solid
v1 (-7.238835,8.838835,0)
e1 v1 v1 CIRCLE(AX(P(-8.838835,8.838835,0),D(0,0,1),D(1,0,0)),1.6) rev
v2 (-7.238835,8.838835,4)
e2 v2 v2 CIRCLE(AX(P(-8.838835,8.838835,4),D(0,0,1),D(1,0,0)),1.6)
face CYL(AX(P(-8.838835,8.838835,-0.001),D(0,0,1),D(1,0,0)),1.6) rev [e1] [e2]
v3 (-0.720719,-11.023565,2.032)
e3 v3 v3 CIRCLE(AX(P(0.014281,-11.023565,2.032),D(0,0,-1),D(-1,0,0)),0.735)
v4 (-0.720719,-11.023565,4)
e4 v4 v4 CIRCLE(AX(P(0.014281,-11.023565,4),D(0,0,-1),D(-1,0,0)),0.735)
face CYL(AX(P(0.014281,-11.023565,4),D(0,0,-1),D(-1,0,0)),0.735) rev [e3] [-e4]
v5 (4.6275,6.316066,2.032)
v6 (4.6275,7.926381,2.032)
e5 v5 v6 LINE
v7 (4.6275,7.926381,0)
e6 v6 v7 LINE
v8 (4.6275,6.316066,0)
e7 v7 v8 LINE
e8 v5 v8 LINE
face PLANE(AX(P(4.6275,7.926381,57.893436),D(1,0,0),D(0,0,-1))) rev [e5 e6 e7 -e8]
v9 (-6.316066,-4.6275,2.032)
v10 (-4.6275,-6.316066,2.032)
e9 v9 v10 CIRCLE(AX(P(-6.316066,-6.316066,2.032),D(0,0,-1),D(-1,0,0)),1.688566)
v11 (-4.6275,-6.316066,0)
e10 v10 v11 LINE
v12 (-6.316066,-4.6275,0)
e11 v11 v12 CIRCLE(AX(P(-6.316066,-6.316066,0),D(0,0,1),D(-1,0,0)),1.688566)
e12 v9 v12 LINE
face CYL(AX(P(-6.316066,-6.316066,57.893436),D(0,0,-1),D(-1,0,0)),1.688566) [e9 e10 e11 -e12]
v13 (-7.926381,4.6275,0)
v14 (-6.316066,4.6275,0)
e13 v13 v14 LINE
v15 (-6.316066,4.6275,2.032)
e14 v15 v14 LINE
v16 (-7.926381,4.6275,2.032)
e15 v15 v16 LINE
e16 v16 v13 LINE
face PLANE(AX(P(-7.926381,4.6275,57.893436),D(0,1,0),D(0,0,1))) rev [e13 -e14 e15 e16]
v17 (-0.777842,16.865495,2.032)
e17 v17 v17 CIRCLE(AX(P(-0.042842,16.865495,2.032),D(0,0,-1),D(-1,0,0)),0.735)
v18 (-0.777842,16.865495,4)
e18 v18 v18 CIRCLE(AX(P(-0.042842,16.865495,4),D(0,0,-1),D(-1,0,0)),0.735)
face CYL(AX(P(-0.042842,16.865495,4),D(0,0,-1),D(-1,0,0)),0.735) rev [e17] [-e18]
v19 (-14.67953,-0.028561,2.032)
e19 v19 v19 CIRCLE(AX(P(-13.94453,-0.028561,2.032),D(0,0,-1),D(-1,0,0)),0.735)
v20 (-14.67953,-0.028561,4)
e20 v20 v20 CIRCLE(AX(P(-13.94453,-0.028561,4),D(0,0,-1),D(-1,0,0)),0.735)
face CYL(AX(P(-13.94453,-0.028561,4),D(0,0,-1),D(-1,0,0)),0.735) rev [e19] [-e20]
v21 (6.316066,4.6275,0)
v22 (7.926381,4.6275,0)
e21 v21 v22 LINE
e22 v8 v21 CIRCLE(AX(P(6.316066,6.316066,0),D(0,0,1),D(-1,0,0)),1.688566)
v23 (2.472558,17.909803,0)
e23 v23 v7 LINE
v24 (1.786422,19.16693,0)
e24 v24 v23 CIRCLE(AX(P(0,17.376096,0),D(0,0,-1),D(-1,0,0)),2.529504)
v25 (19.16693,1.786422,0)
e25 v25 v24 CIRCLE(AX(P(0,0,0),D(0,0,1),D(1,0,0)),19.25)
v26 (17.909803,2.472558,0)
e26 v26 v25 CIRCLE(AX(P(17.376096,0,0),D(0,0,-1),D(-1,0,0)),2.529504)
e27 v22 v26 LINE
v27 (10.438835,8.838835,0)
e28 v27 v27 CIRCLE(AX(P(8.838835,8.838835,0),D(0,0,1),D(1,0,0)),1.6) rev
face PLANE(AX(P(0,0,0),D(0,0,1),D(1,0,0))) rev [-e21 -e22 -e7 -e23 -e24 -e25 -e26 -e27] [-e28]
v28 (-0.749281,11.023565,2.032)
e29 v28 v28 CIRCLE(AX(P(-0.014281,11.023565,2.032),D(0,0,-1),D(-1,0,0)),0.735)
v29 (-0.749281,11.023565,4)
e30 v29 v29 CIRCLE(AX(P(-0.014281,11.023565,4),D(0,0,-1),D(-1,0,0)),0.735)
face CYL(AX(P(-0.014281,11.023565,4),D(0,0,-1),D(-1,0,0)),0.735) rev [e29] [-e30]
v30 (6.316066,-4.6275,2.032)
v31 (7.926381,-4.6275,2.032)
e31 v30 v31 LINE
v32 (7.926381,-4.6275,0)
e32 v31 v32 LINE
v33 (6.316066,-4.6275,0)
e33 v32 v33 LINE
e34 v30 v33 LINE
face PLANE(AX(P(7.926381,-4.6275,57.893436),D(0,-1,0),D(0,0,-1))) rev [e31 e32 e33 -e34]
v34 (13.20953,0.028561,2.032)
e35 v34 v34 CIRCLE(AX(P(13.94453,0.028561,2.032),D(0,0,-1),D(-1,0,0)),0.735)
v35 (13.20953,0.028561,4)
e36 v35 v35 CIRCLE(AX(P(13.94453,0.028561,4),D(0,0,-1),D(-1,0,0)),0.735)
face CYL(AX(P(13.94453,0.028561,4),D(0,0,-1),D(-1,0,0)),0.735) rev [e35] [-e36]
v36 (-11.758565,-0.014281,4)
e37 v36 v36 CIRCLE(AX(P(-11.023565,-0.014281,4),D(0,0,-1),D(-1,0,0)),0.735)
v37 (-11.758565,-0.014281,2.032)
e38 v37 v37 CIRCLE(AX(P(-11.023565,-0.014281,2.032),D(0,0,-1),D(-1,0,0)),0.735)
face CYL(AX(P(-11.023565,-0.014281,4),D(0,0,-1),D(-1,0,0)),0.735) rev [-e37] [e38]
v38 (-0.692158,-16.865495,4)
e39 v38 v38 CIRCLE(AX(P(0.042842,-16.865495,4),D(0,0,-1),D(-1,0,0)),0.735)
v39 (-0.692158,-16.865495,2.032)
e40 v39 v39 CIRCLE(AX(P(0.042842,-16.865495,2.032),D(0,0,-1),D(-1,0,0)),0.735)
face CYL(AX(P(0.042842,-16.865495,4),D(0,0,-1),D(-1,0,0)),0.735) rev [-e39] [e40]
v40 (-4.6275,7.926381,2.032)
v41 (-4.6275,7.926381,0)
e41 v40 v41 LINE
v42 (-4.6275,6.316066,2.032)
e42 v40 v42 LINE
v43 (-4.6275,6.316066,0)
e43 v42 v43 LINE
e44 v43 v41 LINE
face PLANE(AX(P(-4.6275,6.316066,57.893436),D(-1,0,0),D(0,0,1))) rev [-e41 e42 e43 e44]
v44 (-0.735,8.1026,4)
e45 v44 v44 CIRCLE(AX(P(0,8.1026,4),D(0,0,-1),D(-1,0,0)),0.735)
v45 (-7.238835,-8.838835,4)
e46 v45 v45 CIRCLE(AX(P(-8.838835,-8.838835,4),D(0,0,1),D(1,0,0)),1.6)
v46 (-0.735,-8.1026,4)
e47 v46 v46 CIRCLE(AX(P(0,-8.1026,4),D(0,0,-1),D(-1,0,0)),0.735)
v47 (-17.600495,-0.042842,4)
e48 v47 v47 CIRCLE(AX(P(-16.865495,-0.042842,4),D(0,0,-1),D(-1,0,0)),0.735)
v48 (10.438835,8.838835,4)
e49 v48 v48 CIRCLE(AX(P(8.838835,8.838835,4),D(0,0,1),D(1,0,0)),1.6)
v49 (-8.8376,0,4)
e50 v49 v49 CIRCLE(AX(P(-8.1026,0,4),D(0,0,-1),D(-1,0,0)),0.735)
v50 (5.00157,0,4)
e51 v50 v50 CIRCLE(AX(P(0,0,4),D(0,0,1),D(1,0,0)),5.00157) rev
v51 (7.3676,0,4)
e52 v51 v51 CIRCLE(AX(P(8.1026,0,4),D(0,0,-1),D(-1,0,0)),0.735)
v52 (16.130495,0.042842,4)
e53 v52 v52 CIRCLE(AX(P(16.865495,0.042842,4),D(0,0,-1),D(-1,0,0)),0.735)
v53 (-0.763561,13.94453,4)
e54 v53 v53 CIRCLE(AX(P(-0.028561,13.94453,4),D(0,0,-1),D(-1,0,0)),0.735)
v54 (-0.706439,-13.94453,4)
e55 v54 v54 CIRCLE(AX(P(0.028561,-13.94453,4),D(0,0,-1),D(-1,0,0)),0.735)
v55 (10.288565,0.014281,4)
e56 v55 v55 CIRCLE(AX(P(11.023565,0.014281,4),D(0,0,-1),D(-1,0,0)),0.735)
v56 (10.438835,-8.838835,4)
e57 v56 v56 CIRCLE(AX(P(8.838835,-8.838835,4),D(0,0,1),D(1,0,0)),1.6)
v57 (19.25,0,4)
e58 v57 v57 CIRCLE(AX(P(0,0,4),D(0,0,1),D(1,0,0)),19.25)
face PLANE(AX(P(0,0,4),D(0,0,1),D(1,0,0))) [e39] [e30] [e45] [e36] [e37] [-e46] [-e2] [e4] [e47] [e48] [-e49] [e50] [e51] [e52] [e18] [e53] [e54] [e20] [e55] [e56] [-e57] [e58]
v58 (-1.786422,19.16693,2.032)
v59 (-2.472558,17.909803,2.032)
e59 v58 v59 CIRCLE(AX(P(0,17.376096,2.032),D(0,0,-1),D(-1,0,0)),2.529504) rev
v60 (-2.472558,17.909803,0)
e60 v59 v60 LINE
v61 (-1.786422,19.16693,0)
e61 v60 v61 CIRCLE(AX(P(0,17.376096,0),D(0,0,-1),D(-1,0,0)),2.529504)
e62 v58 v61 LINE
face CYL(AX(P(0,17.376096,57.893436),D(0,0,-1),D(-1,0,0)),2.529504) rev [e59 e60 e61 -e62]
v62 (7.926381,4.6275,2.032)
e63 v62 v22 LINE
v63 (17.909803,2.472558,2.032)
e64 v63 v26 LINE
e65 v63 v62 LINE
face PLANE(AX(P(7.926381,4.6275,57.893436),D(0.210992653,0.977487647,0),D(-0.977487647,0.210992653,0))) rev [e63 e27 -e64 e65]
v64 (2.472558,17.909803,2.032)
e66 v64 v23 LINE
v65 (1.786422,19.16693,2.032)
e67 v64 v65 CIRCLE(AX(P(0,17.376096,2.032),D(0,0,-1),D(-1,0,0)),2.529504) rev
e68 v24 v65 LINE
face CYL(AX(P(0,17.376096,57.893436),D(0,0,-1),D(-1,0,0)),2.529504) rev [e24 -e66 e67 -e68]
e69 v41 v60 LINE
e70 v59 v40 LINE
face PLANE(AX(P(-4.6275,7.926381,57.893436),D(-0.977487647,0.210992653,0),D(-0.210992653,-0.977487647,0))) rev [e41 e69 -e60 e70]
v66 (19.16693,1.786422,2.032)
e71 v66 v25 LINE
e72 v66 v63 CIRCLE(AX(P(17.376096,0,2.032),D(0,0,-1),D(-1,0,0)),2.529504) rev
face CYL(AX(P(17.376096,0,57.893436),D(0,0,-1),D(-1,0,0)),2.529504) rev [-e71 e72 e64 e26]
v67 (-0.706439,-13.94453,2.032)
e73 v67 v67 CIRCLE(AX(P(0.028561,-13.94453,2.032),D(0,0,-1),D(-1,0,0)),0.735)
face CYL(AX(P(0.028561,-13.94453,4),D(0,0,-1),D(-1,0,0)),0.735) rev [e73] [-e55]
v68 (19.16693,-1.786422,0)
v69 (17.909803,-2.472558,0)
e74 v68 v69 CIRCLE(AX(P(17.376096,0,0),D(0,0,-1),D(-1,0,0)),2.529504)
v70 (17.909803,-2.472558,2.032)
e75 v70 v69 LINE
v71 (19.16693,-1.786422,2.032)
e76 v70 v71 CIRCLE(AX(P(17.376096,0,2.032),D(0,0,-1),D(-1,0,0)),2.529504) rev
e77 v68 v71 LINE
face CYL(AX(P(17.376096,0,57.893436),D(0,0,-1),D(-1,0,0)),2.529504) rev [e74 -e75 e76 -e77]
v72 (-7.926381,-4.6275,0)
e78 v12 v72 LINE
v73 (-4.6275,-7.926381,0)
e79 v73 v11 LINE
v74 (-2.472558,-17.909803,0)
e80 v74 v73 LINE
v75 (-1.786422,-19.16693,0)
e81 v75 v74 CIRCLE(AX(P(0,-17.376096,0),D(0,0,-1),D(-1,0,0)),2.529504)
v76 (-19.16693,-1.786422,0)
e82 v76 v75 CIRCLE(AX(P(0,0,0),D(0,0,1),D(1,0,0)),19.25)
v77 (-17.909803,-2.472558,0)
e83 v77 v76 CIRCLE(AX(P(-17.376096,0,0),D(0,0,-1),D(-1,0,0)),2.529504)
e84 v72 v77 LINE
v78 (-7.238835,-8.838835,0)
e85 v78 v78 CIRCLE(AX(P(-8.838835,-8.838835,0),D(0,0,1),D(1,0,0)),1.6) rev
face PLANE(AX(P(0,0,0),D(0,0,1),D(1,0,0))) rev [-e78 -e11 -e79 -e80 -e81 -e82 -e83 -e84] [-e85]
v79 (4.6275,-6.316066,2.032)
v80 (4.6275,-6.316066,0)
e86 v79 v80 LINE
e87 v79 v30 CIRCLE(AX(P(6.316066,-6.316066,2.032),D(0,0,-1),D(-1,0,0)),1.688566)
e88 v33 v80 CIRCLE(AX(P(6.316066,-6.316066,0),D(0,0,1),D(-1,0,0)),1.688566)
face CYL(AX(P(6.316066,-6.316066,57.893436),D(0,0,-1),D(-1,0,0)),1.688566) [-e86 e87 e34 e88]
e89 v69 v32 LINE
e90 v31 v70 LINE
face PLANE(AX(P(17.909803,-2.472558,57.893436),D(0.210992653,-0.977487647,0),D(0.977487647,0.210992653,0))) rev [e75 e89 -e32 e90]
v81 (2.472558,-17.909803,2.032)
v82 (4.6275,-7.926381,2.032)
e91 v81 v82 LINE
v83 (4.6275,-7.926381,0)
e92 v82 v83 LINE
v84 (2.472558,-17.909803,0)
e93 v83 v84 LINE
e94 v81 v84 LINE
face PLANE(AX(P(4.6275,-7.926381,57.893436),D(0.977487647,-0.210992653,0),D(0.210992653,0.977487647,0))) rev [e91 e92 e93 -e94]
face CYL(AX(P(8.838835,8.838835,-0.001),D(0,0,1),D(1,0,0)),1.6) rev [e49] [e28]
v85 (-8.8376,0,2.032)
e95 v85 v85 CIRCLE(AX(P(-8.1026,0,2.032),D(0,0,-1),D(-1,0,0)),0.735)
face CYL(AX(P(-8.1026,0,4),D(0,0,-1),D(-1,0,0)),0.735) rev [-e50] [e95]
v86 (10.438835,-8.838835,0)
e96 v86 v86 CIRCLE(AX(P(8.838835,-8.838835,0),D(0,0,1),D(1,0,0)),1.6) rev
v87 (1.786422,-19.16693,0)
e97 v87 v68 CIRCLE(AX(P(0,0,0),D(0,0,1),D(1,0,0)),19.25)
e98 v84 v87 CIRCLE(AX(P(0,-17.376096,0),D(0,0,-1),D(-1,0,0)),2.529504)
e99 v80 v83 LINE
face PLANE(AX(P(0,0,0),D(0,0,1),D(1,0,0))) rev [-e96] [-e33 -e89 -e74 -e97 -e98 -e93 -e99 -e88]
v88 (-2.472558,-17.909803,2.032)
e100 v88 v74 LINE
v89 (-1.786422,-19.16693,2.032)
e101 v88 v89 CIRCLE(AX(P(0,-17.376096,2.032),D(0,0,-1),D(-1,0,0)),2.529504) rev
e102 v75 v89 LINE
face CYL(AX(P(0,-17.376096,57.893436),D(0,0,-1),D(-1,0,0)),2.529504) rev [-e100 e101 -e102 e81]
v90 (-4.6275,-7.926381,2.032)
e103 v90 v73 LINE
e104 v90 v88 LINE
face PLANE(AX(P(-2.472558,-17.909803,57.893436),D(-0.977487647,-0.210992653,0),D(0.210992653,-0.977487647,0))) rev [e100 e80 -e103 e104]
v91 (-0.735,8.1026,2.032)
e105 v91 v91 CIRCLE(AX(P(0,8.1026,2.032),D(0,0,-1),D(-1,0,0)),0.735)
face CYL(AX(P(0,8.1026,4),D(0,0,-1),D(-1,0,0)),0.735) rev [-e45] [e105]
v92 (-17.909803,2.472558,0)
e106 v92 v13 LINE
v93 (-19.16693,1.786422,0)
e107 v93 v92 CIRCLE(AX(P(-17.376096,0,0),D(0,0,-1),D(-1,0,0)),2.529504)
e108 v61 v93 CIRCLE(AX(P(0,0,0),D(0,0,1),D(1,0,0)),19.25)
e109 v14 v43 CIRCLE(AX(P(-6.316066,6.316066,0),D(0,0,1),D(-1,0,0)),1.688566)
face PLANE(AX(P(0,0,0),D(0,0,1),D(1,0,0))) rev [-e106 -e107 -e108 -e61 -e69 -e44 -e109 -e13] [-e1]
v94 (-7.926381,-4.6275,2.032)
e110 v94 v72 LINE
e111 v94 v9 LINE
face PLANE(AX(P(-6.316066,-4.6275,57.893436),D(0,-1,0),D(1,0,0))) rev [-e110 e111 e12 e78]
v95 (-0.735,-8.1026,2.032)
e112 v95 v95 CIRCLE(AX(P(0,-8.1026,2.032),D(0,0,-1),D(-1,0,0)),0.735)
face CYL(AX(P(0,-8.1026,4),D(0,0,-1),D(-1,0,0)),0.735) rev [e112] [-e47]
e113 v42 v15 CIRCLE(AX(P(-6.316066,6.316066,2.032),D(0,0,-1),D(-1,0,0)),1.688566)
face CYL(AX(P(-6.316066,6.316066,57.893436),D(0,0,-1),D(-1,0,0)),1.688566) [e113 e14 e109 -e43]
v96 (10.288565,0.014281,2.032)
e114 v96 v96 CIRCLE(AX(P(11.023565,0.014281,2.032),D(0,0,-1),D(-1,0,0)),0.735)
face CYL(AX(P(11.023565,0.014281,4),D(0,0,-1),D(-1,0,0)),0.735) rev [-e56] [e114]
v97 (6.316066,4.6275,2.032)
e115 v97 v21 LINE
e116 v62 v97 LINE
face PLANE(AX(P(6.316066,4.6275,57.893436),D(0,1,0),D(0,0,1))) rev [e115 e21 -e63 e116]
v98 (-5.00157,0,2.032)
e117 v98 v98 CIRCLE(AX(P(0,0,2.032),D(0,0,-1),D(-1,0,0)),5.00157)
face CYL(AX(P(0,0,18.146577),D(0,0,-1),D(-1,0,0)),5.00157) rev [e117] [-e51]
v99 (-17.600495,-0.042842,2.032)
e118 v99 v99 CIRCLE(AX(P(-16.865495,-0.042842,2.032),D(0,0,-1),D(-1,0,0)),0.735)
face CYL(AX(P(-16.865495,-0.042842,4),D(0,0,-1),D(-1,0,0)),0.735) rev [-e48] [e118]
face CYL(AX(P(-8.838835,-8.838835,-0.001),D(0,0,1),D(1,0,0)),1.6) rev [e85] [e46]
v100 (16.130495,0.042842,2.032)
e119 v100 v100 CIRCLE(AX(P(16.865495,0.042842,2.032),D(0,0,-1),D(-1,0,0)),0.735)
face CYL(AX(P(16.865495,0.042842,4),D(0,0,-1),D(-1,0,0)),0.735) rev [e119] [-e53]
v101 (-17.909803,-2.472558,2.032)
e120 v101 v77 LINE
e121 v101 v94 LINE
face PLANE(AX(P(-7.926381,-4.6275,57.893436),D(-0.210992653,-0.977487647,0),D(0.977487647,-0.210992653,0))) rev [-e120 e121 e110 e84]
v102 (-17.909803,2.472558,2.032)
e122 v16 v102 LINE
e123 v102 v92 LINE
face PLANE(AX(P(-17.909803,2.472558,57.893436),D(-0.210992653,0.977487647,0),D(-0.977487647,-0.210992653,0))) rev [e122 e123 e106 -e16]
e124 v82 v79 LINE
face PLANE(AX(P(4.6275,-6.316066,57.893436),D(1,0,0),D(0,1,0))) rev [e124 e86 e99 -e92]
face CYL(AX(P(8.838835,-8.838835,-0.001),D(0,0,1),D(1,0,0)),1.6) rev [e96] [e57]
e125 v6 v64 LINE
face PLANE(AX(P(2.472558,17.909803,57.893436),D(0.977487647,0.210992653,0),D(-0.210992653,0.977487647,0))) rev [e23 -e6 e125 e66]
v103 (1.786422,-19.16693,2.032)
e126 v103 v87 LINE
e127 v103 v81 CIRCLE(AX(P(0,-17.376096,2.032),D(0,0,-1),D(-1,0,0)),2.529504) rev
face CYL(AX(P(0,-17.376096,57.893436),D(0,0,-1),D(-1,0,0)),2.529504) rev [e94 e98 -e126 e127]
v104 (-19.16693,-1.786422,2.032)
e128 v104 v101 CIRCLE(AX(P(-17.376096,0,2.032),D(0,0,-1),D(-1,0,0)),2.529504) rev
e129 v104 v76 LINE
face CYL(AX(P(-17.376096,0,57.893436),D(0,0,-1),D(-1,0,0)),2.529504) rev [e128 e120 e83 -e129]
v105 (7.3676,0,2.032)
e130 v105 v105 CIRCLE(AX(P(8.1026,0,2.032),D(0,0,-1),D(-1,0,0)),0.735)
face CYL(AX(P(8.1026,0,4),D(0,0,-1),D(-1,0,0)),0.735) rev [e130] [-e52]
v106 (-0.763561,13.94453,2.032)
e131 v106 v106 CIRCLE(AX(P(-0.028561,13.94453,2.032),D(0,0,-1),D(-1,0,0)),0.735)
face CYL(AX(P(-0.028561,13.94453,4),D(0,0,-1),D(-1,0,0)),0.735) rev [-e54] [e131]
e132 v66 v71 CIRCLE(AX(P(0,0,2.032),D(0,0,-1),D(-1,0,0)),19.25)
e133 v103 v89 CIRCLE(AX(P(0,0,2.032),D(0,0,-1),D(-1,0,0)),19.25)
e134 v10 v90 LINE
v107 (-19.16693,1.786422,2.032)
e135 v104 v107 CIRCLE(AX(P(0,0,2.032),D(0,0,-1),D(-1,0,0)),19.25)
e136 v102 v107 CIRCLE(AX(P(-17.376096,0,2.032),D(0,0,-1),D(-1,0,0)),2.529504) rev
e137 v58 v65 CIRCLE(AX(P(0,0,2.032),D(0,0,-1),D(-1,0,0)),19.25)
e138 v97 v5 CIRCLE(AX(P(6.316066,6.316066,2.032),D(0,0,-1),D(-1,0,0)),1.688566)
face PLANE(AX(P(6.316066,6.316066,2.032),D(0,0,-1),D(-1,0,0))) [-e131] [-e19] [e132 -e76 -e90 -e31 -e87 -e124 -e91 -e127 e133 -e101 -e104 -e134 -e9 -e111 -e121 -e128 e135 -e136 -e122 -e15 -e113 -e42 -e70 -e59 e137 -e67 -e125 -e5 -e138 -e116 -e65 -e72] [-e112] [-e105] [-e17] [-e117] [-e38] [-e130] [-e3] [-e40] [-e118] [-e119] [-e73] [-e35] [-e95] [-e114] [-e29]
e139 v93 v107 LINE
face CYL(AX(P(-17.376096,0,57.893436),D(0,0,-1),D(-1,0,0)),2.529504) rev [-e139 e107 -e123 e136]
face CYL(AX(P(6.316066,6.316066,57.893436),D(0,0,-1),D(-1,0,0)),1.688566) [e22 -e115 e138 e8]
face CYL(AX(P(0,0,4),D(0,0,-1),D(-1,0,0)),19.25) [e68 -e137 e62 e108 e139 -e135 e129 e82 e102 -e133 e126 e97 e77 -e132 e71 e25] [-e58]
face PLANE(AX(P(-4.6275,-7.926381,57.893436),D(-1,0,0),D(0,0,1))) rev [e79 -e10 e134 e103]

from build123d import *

# Parameters (mm, degrees)
SKETCH1_R             = 19.25
BOSS_EXTRUDE1_DEPTH   = 4
CAVITY1_OUTLINE_R     = 0.635
CAVITY1_OUTLINE_R_2   = 2.9845
CAVITY1_DEPTH         = 2.032
CAVITY1_2_DEPTH       = 1.397
CAVITY1_START         = 0.6858
CAVITY1_3_OUTLINE_R   = 2.9845
CAVITY1_3_OUTLINE_R_2 = 1.4605
CAVITY1_3_DEPTH       = 0.7112
CAVITY1_START_2       = 2.032
CAVITY1_4_OUTLINE_R   = 19.25
CAVITY1_4_OUTLINE_R_2 = 2.9845
CAVITY1_4_DEPTH       = 0.635
SKETCH3_R             = 0.735
CUT_EXTRUDE2_DEPTH    = 28.515904492
SKETCH5_R             = 5.001570325
CUT_EXTRUDE4_DEPTH    = 4
CUT_EXTRUDE1_START    = -2.032
CUT_EXTRUDE1_DEPTH    = 2.032
CUT_EXTRUDE5_REACH    = 29.516
SKETCH6_R             = 1.6


with BuildPart() as part:
    # Sketch1 → Boss-Extrude1 (new body)
    with BuildSketch(Plane.XY):
        Circle(SKETCH1_R)
    extrude(amount=BOSS_EXTRUDE1_DEPTH)

    # Cavity1: read off the stored shape, not the designer's step
    # Cavity1 outline → Cavity1 (cut)
    with BuildSketch(Plane.XY):
        with BuildLine():
            Line((4.1275, 7.873032293), (1.983814648, 17.804306789))
            ThreePointArc((1.983814648, 17.804306789), (1.57335187, 18.658067023), (0.820101074, 19.232522825))
            ThreePointArc((0.820101074, 19.232522825), (0, 19.25), (-0.820101074, 19.232522825))
            ThreePointArc((-0.820101074, 19.232522825), (-1.57335187, 18.658067023), (-1.983814648, 17.804306789))
            Line((-1.983814648, 17.804306789), (-4.1275, 7.873032293))
            Line((-4.1275, 7.873032293), (-4.1275, 6.316065522))
            ThreePointArc((-4.1275, 6.316065522), (-4.768516, 4.768516), (-6.316065522, 4.1275))
            Line((-6.316065522, 4.1275), (-7.873032293, 4.1275))
            Line((-7.873032293, 4.1275), (-17.804306789, 1.983814648))
            ThreePointArc((-17.804306789, 1.983814648), (-18.658067023, 1.57335187), (-19.232522825, 0.820101074))
            ThreePointArc((-19.232522825, 0.820101074), (-19.25, 0), (-19.232522825, -0.820101074))
            ThreePointArc((-19.232522825, -0.820101074), (-18.658067023, -1.57335187), (-17.804306789, -1.983814648))
            Line((-17.804306789, -1.983814648), (-7.873032293, -4.1275))
            Line((-7.873032293, -4.1275), (-6.316065522, -4.1275))
            ThreePointArc((-6.316065522, -4.1275), (-4.768516, -4.768516), (-4.1275, -6.316065522))
            Line((-4.1275, -6.316065522), (-4.1275, -7.873032293))
            Line((-4.1275, -7.873032293), (-1.983814648, -17.804306789))
            ThreePointArc((-1.983814648, -17.804306789), (-1.57335187, -18.658067023), (-0.820101074, -19.232522825))
            ThreePointArc((-0.820101074, -19.232522825), (0, -19.25), (0.820101074, -19.232522825))
            ThreePointArc((0.820101074, -19.232522825), (1.57335187, -18.658067023), (1.983814648, -17.804306789))
            Line((1.983814648, -17.804306789), (4.1275, -7.873032293))
            Line((4.1275, -7.873032293), (4.1275, -6.316065522))
            ThreePointArc((4.1275, -6.316065522), (4.768516, -4.768516), (6.316065522, -4.1275))
            Line((6.316065522, -4.1275), (7.873032293, -4.1275))
            Line((7.873032293, -4.1275), (17.804306789, -1.983814648))
            ThreePointArc((17.804306789, -1.983814648), (18.658067023, -1.57335187), (19.232522825, -0.820101074))
            ThreePointArc((19.232522825, -0.820101074), (19.25, 0), (19.232522825, 0.820101074))
            ThreePointArc((19.232522825, 0.820101074), (18.658067023, 1.57335187), (17.804306789, 1.983814648))
            Line((17.804306789, 1.983814648), (7.873032293, 4.1275))
            Line((7.873032293, 4.1275), (6.316065522, 4.1275))
            ThreePointArc((6.316065522, 4.1275), (4.768516, 4.768516), (4.1275, 6.316065522))
            Line((4.1275, 6.316065522), (4.1275, 7.873032293))
        make_face()
        with Locations((-16.865495273, -0.042841993)):
            Circle(CAVITY1_OUTLINE_R, mode=Mode.SUBTRACT)
        with Locations((-13.944530182, -0.028561329)):
            Circle(CAVITY1_OUTLINE_R, mode=Mode.SUBTRACT)
        with Locations((-11.023565091, -0.014280664)):
            Circle(CAVITY1_OUTLINE_R, mode=Mode.SUBTRACT)
        with BuildLine():
            ThreePointArc((-0.381, -4.683528584), (-1.798229449, -4.341309923), (-3.042347138, -3.581162505))
            Line((-3.042347138, -3.581162505), (-2.230589816, -2.769405184))
            ThreePointArc((-2.230589816, -2.769405184), (-1.360822285, -3.285315618), (-0.381, -3.53553037))
            Line((-0.381, -3.53553037), (-0.381, -4.683528584))
        make_face(mode=Mode.SUBTRACT)
        with BuildLine():
            ThreePointArc((-3.581162505, -3.042347138), (-4.341309923, -1.798229449), (-4.683528584, -0.381))
            Line((-4.683528584, -0.381), (-3.53553037, -0.381))
            ThreePointArc((-3.53553037, -0.381), (-3.285315618, -1.360822285), (-2.769405184, -2.230589816))
            Line((-2.769405184, -2.230589816), (-3.581162505, -3.042347138))
        make_face(mode=Mode.SUBTRACT)
        with Locations((0.042841993, -16.865495273)):
            Circle(CAVITY1_OUTLINE_R, mode=Mode.SUBTRACT)
        with Locations((0.028561329, -13.944530182)):
            Circle(CAVITY1_OUTLINE_R, mode=Mode.SUBTRACT)
        with Locations((0.014280664, -11.023565091)):
            Circle(CAVITY1_OUTLINE_R, mode=Mode.SUBTRACT)
        with Locations((0, -8.1026)):
            Circle(CAVITY1_OUTLINE_R, mode=Mode.SUBTRACT)
        with BuildLine():
            ThreePointArc((3.042347138, -3.581162505), (1.798229449, -4.341309923), (0.381, -4.683528584))
            Line((0.381, -4.683528584), (0.381, -3.53553037))
            ThreePointArc((0.381, -3.53553037), (1.360822285, -3.285315618), (2.230589816, -2.769405184))
            Line((2.230589816, -2.769405184), (3.042347138, -3.581162505))
        make_face(mode=Mode.SUBTRACT)
        with BuildLine():
            ThreePointArc((4.683528584, -0.381), (4.341309923, -1.798229449), (3.581162505, -3.042347138))
            Line((3.581162505, -3.042347138), (2.769405184, -2.230589816))
            ThreePointArc((2.769405184, -2.230589816), (3.285315618, -1.360822285), (3.53553037, -0.381))
            Line((3.53553037, -0.381), (4.683528584, -0.381))
        make_face(mode=Mode.SUBTRACT)
        with Locations((-8.1026, 0)):
            Circle(CAVITY1_OUTLINE_R, mode=Mode.SUBTRACT)
        with BuildLine():
            ThreePointArc((-4.683528584, 0.381), (-4.341309923, 1.798229449), (-3.581162505, 3.042347138))
            Line((-3.581162505, 3.042347138), (-2.769405184, 2.230589816))
            ThreePointArc((-2.769405184, 2.230589816), (-3.285315618, 1.360822285), (-3.53553037, 0.381))
            Line((-3.53553037, 0.381), (-4.683528584, 0.381))
        make_face(mode=Mode.SUBTRACT)
        with BuildLine():
            ThreePointArc((-3.042347138, 3.581162505), (-1.798229449, 4.341309923), (-0.381, 4.683528584))
            Line((-0.381, 4.683528584), (-0.381, 3.53553037))
            ThreePointArc((-0.381, 3.53553037), (-1.360822285, 3.285315618), (-2.230589816, 2.769405184))
            Line((-2.230589816, 2.769405184), (-3.042347138, 3.581162505))
        make_face(mode=Mode.SUBTRACT)
        with Locations((-0.014280664, 11.023565091)):
            Circle(CAVITY1_OUTLINE_R, mode=Mode.SUBTRACT)
        with Locations((-0.028561329, 13.944530182)):
            Circle(CAVITY1_OUTLINE_R, mode=Mode.SUBTRACT)
        with Locations((-0.042841993, 16.865495273)):
            Circle(CAVITY1_OUTLINE_R, mode=Mode.SUBTRACT)
        Circle(CAVITY1_OUTLINE_R_2, mode=Mode.SUBTRACT)
        with BuildLine():
            ThreePointArc((3.581162505, 3.042347138), (4.341309923, 1.798229449), (4.683528584, 0.381))
            Line((4.683528584, 0.381), (3.53553037, 0.381))
            ThreePointArc((3.53553037, 0.381), (3.285315618, 1.360822285), (2.769405184, 2.230589816))
            Line((2.769405184, 2.230589816), (3.581162505, 3.042347138))
        make_face(mode=Mode.SUBTRACT)
        with BuildLine():
            ThreePointArc((0.381, 4.683528584), (1.798229449, 4.341309923), (3.042347138, 3.581162505))
            Line((3.042347138, 3.581162505), (2.230589816, 2.769405184))
            ThreePointArc((2.230589816, 2.769405184), (1.360822285, 3.285315618), (0.381, 3.53553037))
            Line((0.381, 3.53553037), (0.381, 4.683528584))
        make_face(mode=Mode.SUBTRACT)
        with Locations((8.1026, 0)):
            Circle(CAVITY1_OUTLINE_R, mode=Mode.SUBTRACT)
        with Locations((0, 8.1026)):
            Circle(CAVITY1_OUTLINE_R, mode=Mode.SUBTRACT)
        with Locations((11.023565091, 0.014280664)):
            Circle(CAVITY1_OUTLINE_R, mode=Mode.SUBTRACT)
        with Locations((13.944530182, 0.028561329)):
            Circle(CAVITY1_OUTLINE_R, mode=Mode.SUBTRACT)
        with Locations((16.865495273, 0.042841993)):
            Circle(CAVITY1_OUTLINE_R, mode=Mode.SUBTRACT)
    extrude(amount=CAVITY1_DEPTH, mode=Mode.SUBTRACT)

    # Cavity1 2 outline → Cavity1 2 (cut)
    with BuildSketch(Plane.XY):
        with BuildLine():
            Line((2.230589816, 2.769405184), (3.042347138, 3.581162505))
            ThreePointArc((3.042347138, 3.581162505), (1.798229449, 4.341309923), (0.381, 4.683528584))
            Line((0.381, 4.683528584), (0.381, 3.53553037))
            ThreePointArc((0.381, 3.53553037), (1.360822285, 3.285315618), (2.230589816, 2.769405184))
        make_face()
        with BuildLine():
            Line((3.53553037, 0.381), (4.683528584, 0.381))
            ThreePointArc((4.683528584, 0.381), (4.341309923, 1.798229449), (3.581162505, 3.042347138))
            Line((3.581162505, 3.042347138), (2.769405184, 2.230589816))
            ThreePointArc((2.769405184, 2.230589816), (3.285315618, 1.360822285), (3.53553037, 0.381))
        make_face()
        with BuildLine():
            Line((2.769405184, -2.230589816), (3.581162505, -3.042347138))
            ThreePointArc((3.581162505, -3.042347138), (4.341309923, -1.798229449), (4.683528584, -0.381))
            Line((4.683528584, -0.381), (3.53553037, -0.381))
            ThreePointArc((3.53553037, -0.381), (3.285315618, -1.360822285), (2.769405184, -2.230589816))
        make_face()
        with BuildLine():
            Line((0.381, -3.53553037), (0.381, -4.683528584))
            ThreePointArc((0.381, -4.683528584), (1.798229449, -4.341309923), (3.042347138, -3.581162505))
            Line((3.042347138, -3.581162505), (2.230589816, -2.769405184))
            ThreePointArc((2.230589816, -2.769405184), (1.360822285, -3.285315618), (0.381, -3.53553037))
        make_face()
        with BuildLine():
            Line((-2.230589816, -2.769405184), (-3.042347138, -3.581162505))
            ThreePointArc((-3.042347138, -3.581162505), (-1.798229449, -4.341309923), (-0.381, -4.683528584))
            Line((-0.381, -4.683528584), (-0.381, -3.53553037))
            ThreePointArc((-0.381, -3.53553037), (-1.360822285, -3.285315618), (-2.230589816, -2.769405184))
        make_face()
        with BuildLine():
            Line((-3.53553037, -0.381), (-4.683528584, -0.381))
            ThreePointArc((-4.683528584, -0.381), (-4.341309923, -1.798229449), (-3.581162505, -3.042347138))
            Line((-3.581162505, -3.042347138), (-2.769405184, -2.230589816))
            ThreePointArc((-2.769405184, -2.230589816), (-3.285315618, -1.360822285), (-3.53553037, -0.381))
        make_face()
        with BuildLine():
            Line((-2.769405184, 2.230589816), (-3.581162505, 3.042347138))
            ThreePointArc((-3.581162505, 3.042347138), (-4.341309923, 1.798229449), (-4.683528584, 0.381))
            Line((-4.683528584, 0.381), (-3.53553037, 0.381))
            ThreePointArc((-3.53553037, 0.381), (-3.285315618, 1.360822285), (-2.769405184, 2.230589816))
        make_face()
        with BuildLine():
            Line((-0.381, 3.53553037), (-0.381, 4.683528584))
            ThreePointArc((-0.381, 4.683528584), (-1.798229449, 4.341309923), (-3.042347138, 3.581162505))
            Line((-3.042347138, 3.581162505), (-2.230589816, 2.769405184))
            ThreePointArc((-2.230589816, 2.769405184), (-1.360822285, 3.285315618), (-0.381, 3.53553037))
        make_face()
    extrude(amount=CAVITY1_2_DEPTH, mode=Mode.SUBTRACT)

    # Cavity1 3 outline → Cavity1 3 (cut)
    with BuildSketch(Plane.XY.offset(CAVITY1_START)):
        Circle(CAVITY1_3_OUTLINE_R)
        Circle(CAVITY1_3_OUTLINE_R_2, mode=Mode.SUBTRACT)
    extrude(amount=CAVITY1_3_DEPTH, mode=Mode.SUBTRACT)

    # Cavity1 4 outline → Cavity1 4 (cut)
    with BuildSketch(Plane.XY.offset(CAVITY1_START_2)):
        Circle(CAVITY1_4_OUTLINE_R)
        with BuildLine():
            Line((-3.042347138, -3.581162505), (-2.230589816, -2.769405184))
            ThreePointArc((-2.230589816, -2.769405184), (-1.360822285, -3.285315618), (-0.381, -3.53553037))
            Line((-0.381, -3.53553037), (-0.381, -4.683528584))
            ThreePointArc((-0.381, -4.683528584), (-1.798229449, -4.341309923), (-3.042347138, -3.581162505))
        make_face(mode=Mode.SUBTRACT)
        with BuildLine():
            ThreePointArc((-3.53553037, -0.381), (-3.285315618, -1.360822285), (-2.769405184, -2.230589816))
            Line((-2.769405184, -2.230589816), (-3.581162505, -3.042347138))
            ThreePointArc((-3.581162505, -3.042347138), (-4.341309923, -1.798229449), (-4.683528584, -0.381))
            Line((-4.683528584, -0.381), (-3.53553037, -0.381))
        make_face(mode=Mode.SUBTRACT)
        with BuildLine():
            Line((0.381, -4.683528584), (0.381, -3.53553037))
            ThreePointArc((0.381, -3.53553037), (1.360822285, -3.285315618), (2.230589816, -2.769405184))
            Line((2.230589816, -2.769405184), (3.042347138, -3.581162505))
            ThreePointArc((3.042347138, -3.581162505), (1.798229449, -4.341309923), (0.381, -4.683528584))
        make_face(mode=Mode.SUBTRACT)
        with BuildLine():
            Line((3.581162505, -3.042347138), (2.769405184, -2.230589816))
            ThreePointArc((2.769405184, -2.230589816), (3.285315618, -1.360822285), (3.53553037, -0.381))
            Line((3.53553037, -0.381), (4.683528584, -0.381))
            ThreePointArc((4.683528584, -0.381), (4.341309923, -1.798229449), (3.581162505, -3.042347138))
        make_face(mode=Mode.SUBTRACT)
        with BuildLine():
            Line((-3.581162505, 3.042347138), (-2.769405184, 2.230589816))
            ThreePointArc((-2.769405184, 2.230589816), (-3.285315618, 1.360822285), (-3.53553037, 0.381))
            Line((-3.53553037, 0.381), (-4.683528584, 0.381))
            ThreePointArc((-4.683528584, 0.381), (-4.341309923, 1.798229449), (-3.581162505, 3.042347138))
        make_face(mode=Mode.SUBTRACT)
        with BuildLine():
            Line((-0.381, 4.683528584), (-0.381, 3.53553037))
            ThreePointArc((-0.381, 3.53553037), (-1.360822285, 3.285315618), (-2.230589816, 2.769405184))
            Line((-2.230589816, 2.769405184), (-3.042347138, 3.581162505))
            ThreePointArc((-3.042347138, 3.581162505), (-1.798229449, 4.341309923), (-0.381, 4.683528584))
        make_face(mode=Mode.SUBTRACT)
        Circle(CAVITY1_4_OUTLINE_R_2, mode=Mode.SUBTRACT)
        with BuildLine():
            Line((4.683528584, 0.381), (3.53553037, 0.381))
            ThreePointArc((3.53553037, 0.381), (3.285315618, 1.360822285), (2.769405184, 2.230589816))
            Line((2.769405184, 2.230589816), (3.581162505, 3.042347138))
            ThreePointArc((3.581162505, 3.042347138), (4.341309923, 1.798229449), (4.683528584, 0.381))
        make_face(mode=Mode.SUBTRACT)
        with BuildLine():
            ThreePointArc((0.381, 4.683528584), (1.798229449, 4.341309923), (3.042347138, 3.581162505))
            Line((3.042347138, 3.581162505), (2.230589816, 2.769405184))
            ThreePointArc((2.230589816, 2.769405184), (1.360822285, 3.285315618), (0.381, 3.53553037))
            Line((0.381, 3.53553037), (0.381, 4.683528584))
        make_face(mode=Mode.SUBTRACT)
    extrude(amount=CAVITY1_4_DEPTH, mode=Mode.SUBTRACT)

    # Cavity1 5 outline → Cavity1 5 (revolve)
    with BuildSketch(Plane.XZ):
        Polygon((4.701570325, 2.032), (19.25, 2.032), (19.25, 2.667), (3.555999999, 2.667), align=None)
    revolve(axis=Axis((0, 0, 0), (0, 0, 1)))

    # Sketch3 → Cut-Extrude2 (cut, through all)
    with BuildSketch(Plane(origin=(0, 0, 0), x_dir=(-1, 0, 0), z_dir=(0, 0, -1))):
        with Locations((16.865495273, -0.042841993)):
            Circle(SKETCH3_R)
        with Locations((13.944530182, -0.028561329)):
            Circle(SKETCH3_R)
        with Locations((11.023565091, -0.014280664)):
            Circle(SKETCH3_R)
        with Locations((8.1026, 0)):
            Circle(SKETCH3_R)
        with Locations((-0.042841993, -16.865495273)):
            Circle(SKETCH3_R)
        with Locations((-0.028561329, -13.944530182)):
            Circle(SKETCH3_R)
        with Locations((-0.014280664, -11.023565091)):
            Circle(SKETCH3_R)
        with Locations((0, -8.1026)):
            Circle(SKETCH3_R)
        with Locations((-16.865495273, 0.042841993)):
            Circle(SKETCH3_R)
        with Locations((-13.944530182, 0.028561329)):
            Circle(SKETCH3_R)
        with Locations((-11.023565091, 0.014280664)):
            Circle(SKETCH3_R)
        with Locations((-8.1026, 0)):
            Circle(SKETCH3_R)
        with Locations((0, 8.1026)):
            Circle(SKETCH3_R)
        with Locations((0.014280664, 11.023565091)):
            Circle(SKETCH3_R)
        with Locations((0.028561329, 13.944530182)):
            Circle(SKETCH3_R)
        with Locations((0.042841993, 16.865495273)):
            Circle(SKETCH3_R)
    extrude(amount=-CUT_EXTRUDE2_DEPTH, mode=Mode.SUBTRACT)

    # Sketch5 → Cut-Extrude4 (cut)
    with BuildSketch(Plane(origin=(0, 0, 0), x_dir=(-1, 0, 0), z_dir=(0, 0, -1))):
        Circle(SKETCH5_R)
    extrude(amount=-CUT_EXTRUDE4_DEPTH, mode=Mode.SUBTRACT)

    # Sketch2 → Cut-Extrude1 (cut)
    with BuildSketch(Plane(origin=(0, 0, 0), x_dir=(-1, 0, 0), z_dir=(0, 0, -1)).offset(CUT_EXTRUDE1_START)):
        with BuildLine():
            Line((-2.472558472, 17.909803115), (-4.6275, 7.926380958))
            Line((-4.6275, 7.926380958), (-4.6275, 6.316065522))
            ThreePointArc((-4.6275, 6.316065522), (-5.122069391, 5.122069391), (-6.316065522, 4.6275))
            Line((-6.316065522, 4.6275), (-7.926380958, 4.6275))
            Line((-7.926380958, 4.6275), (-17.909803115, 2.472558472))
            ThreePointArc((-17.909803115, 2.472558472), (-19.011904483, 1.929383395), (-19.72804541, 0.930980289))
            ThreePointArc((-19.72804541, 0.930980289), (-19.75, 0), (-19.72804541, -0.930980289))
            ThreePointArc((-19.72804541, -0.930980289), (-19.011904483, -1.929383395), (-17.909803115, -2.472558472))
            Line((-17.909803115, -2.472558472), (-7.926380958, -4.6275))
            Line((-7.926380958, -4.6275), (-6.316065522, -4.6275))
            ThreePointArc((-6.316065522, -4.6275), (-5.122069391, -5.122069391), (-4.6275, -6.316065522))
            Line((-4.6275, -6.316065522), (-4.6275, -7.926380958))
            Line((-4.6275, -7.926380958), (-2.472558472, -17.909803115))
            ThreePointArc((-2.472558472, -17.909803115), (-1.929383395, -19.011904483), (-0.930980289, -19.72804541))
            ThreePointArc((-0.930980289, -19.72804541), (0, -19.75), (0.930980289, -19.72804541))
            ThreePointArc((0.930980289, -19.72804541), (1.929383395, -19.011904483), (2.472558472, -17.909803115))
            Line((2.472558472, -17.909803115), (4.6275, -7.926380958))
            Line((4.6275, -7.926380958), (4.6275, -6.316065522))
            ThreePointArc((4.6275, -6.316065522), (5.122069391, -5.122069391), (6.316065522, -4.6275))
            Line((6.316065522, -4.6275), (7.926380958, -4.6275))
            Line((7.926380958, -4.6275), (17.909803115, -2.472558472))
            ThreePointArc((17.909803115, -2.472558472), (19.011904483, -1.929383395), (19.72804541, -0.930980289))
            ThreePointArc((19.72804541, -0.930980289), (19.75, 0), (19.72804541, 0.930980289))
            ThreePointArc((19.72804541, 0.930980289), (19.011904483, 1.929383395), (17.909803115, 2.472558472))
            Line((17.909803115, 2.472558472), (7.926380958, 4.6275))
            Line((7.926380958, 4.6275), (6.316065522, 4.6275))
            ThreePointArc((6.316065522, 4.6275), (5.122069391, 5.122069391), (4.6275, 6.316065522))
            Line((4.6275, 6.316065522), (4.6275, 7.926380958))
            Line((4.6275, 7.926380958), (2.472558472, 17.909803115))
            ThreePointArc((2.472558472, 17.909803115), (1.929383395, 19.011904483), (0.930980289, 19.72804541))
            ThreePointArc((0.930980289, 19.72804541), (0, 19.75), (-0.930980289, 19.72804541))
            ThreePointArc((-0.930980289, 19.72804541), (-1.929383395, 19.011904483), (-2.472558472, 17.909803115))
        make_face()
        with BuildLine():
            Line((-1.983814648, 17.804306789), (-4.1275, 7.873032293))
            Line((-4.1275, 7.873032293), (-4.1275, 6.316065522))
            ThreePointArc((-4.1275, 6.316065522), (-4.768516, 4.768516), (-6.316065522, 4.1275))
            Line((-6.316065522, 4.1275), (-7.873032293, 4.1275))
            Line((-7.873032293, 4.1275), (-17.804306789, 1.983814648))
            ThreePointArc((-17.804306789, 1.983814648), (-18.658067023, 1.57335187), (-19.232522825, 0.820101074))
            ThreePointArc((-19.232522825, 0.820101074), (-19.25, 0), (-19.232522825, -0.820101074))
            ThreePointArc((-19.232522825, -0.820101074), (-18.658067023, -1.57335187), (-17.804306789, -1.983814648))
            Line((-17.804306789, -1.983814648), (-7.873032293, -4.1275))
            Line((-7.873032293, -4.1275), (-6.316065522, -4.1275))
            ThreePointArc((-6.316065522, -4.1275), (-4.768516, -4.768516), (-4.1275, -6.316065522))
            Line((-4.1275, -6.316065522), (-4.1275, -7.873032293))
            Line((-4.1275, -7.873032293), (-1.983814648, -17.804306789))
            ThreePointArc((-1.983814648, -17.804306789), (-1.57335187, -18.658067023), (-0.820101074, -19.232522825))
            ThreePointArc((-0.820101074, -19.232522825), (0, -19.25), (0.820101074, -19.232522825))
            ThreePointArc((0.820101074, -19.232522825), (1.57335187, -18.658067023), (1.983814648, -17.804306789))
            Line((1.983814648, -17.804306789), (4.1275, -7.873032293))
            Line((4.1275, -7.873032293), (4.1275, -6.316065522))
            ThreePointArc((4.1275, -6.316065522), (4.768516, -4.768516), (6.316065522, -4.1275))
            Line((6.316065522, -4.1275), (7.873032293, -4.1275))
            Line((7.873032293, -4.1275), (17.804306789, -1.983814648))
            ThreePointArc((17.804306789, -1.983814648), (18.658067023, -1.57335187), (19.232522825, -0.820101074))
            ThreePointArc((19.232522825, -0.820101074), (19.25, 0), (19.232522825, 0.820101074))
            ThreePointArc((19.232522825, 0.820101074), (18.658067023, 1.57335187), (17.804306789, 1.983814648))
            Line((17.804306789, 1.983814648), (7.873032293, 4.1275))
            Line((7.873032293, 4.1275), (6.316065522, 4.1275))
            ThreePointArc((6.316065522, 4.1275), (4.768516, 4.768516), (4.1275, 6.316065522))
            Line((4.1275, 6.316065522), (4.1275, 7.873032293))
            Line((4.1275, 7.873032293), (1.983814648, 17.804306789))
            ThreePointArc((1.983814648, 17.804306789), (1.57335187, 18.658067023), (0.820101074, 19.232522825))
            ThreePointArc((0.820101074, 19.232522825), (0, 19.25), (-0.820101074, 19.232522825))
            ThreePointArc((-0.820101074, 19.232522825), (-1.57335187, 18.658067023), (-1.983814648, 17.804306789))
        make_face(mode=Mode.SUBTRACT)
    extrude(amount=CUT_EXTRUDE1_DEPTH, mode=Mode.SUBTRACT)

    # Sketch6 → Cut-Extrude5 (cut, up to next)
    with BuildSketch(Plane.XY.offset(4), mode=Mode.PRIVATE) as cut_extrude5_sk1:
        with Locations((8.838834765, 8.838834765)):
            Circle(SKETCH6_R)
    cut_extrude5_tool1 = extrude(cut_extrude5_sk1.sketch, amount=-CUT_EXTRUDE5_REACH, mode=Mode.PRIVATE) & part.part
    # Sketch6 → Cut-Extrude5 (cut, up to next)
    with BuildSketch(Plane.XY.offset(4), mode=Mode.PRIVATE) as cut_extrude5_sk2:
        with Locations((8.838834765, -8.838834765)):
            Circle(SKETCH6_R)
    cut_extrude5_tool2 = extrude(cut_extrude5_sk2.sketch, amount=-CUT_EXTRUDE5_REACH, mode=Mode.PRIVATE) & part.part
    # Sketch6 → Cut-Extrude5 (cut, up to next)
    with BuildSketch(Plane.XY.offset(4), mode=Mode.PRIVATE) as cut_extrude5_sk3:
        with Locations((-8.838834765, 8.838834765)):
            Circle(SKETCH6_R)
    cut_extrude5_tool3 = extrude(cut_extrude5_sk3.sketch, amount=-CUT_EXTRUDE5_REACH, mode=Mode.PRIVATE) & part.part
    # Sketch6 → Cut-Extrude5 (cut, up to next)
    with BuildSketch(Plane.XY.offset(4), mode=Mode.PRIVATE) as cut_extrude5_sk4:
        with Locations((-8.838834765, -8.838834765)):
            Circle(SKETCH6_R)
    cut_extrude5_tool4 = extrude(cut_extrude5_sk4.sketch, amount=-CUT_EXTRUDE5_REACH, mode=Mode.PRIVATE) & part.part
    add(cut_extrude5_tool1.solids().sort_by_distance((8.838835, 8.838835, 4))[0], mode=Mode.SUBTRACT)
    add(cut_extrude5_tool2.solids().sort_by_distance((8.838835, -8.838835, 4))[0], mode=Mode.SUBTRACT)
    add(cut_extrude5_tool3.solids().sort_by_distance((-8.838835, 8.838835, 4))[0], mode=Mode.SUBTRACT)
    add(cut_extrude5_tool4.solids().sort_by_distance((-8.838835, -8.838835, 4))[0], mode=Mode.SUBTRACT)


solid = part.part
